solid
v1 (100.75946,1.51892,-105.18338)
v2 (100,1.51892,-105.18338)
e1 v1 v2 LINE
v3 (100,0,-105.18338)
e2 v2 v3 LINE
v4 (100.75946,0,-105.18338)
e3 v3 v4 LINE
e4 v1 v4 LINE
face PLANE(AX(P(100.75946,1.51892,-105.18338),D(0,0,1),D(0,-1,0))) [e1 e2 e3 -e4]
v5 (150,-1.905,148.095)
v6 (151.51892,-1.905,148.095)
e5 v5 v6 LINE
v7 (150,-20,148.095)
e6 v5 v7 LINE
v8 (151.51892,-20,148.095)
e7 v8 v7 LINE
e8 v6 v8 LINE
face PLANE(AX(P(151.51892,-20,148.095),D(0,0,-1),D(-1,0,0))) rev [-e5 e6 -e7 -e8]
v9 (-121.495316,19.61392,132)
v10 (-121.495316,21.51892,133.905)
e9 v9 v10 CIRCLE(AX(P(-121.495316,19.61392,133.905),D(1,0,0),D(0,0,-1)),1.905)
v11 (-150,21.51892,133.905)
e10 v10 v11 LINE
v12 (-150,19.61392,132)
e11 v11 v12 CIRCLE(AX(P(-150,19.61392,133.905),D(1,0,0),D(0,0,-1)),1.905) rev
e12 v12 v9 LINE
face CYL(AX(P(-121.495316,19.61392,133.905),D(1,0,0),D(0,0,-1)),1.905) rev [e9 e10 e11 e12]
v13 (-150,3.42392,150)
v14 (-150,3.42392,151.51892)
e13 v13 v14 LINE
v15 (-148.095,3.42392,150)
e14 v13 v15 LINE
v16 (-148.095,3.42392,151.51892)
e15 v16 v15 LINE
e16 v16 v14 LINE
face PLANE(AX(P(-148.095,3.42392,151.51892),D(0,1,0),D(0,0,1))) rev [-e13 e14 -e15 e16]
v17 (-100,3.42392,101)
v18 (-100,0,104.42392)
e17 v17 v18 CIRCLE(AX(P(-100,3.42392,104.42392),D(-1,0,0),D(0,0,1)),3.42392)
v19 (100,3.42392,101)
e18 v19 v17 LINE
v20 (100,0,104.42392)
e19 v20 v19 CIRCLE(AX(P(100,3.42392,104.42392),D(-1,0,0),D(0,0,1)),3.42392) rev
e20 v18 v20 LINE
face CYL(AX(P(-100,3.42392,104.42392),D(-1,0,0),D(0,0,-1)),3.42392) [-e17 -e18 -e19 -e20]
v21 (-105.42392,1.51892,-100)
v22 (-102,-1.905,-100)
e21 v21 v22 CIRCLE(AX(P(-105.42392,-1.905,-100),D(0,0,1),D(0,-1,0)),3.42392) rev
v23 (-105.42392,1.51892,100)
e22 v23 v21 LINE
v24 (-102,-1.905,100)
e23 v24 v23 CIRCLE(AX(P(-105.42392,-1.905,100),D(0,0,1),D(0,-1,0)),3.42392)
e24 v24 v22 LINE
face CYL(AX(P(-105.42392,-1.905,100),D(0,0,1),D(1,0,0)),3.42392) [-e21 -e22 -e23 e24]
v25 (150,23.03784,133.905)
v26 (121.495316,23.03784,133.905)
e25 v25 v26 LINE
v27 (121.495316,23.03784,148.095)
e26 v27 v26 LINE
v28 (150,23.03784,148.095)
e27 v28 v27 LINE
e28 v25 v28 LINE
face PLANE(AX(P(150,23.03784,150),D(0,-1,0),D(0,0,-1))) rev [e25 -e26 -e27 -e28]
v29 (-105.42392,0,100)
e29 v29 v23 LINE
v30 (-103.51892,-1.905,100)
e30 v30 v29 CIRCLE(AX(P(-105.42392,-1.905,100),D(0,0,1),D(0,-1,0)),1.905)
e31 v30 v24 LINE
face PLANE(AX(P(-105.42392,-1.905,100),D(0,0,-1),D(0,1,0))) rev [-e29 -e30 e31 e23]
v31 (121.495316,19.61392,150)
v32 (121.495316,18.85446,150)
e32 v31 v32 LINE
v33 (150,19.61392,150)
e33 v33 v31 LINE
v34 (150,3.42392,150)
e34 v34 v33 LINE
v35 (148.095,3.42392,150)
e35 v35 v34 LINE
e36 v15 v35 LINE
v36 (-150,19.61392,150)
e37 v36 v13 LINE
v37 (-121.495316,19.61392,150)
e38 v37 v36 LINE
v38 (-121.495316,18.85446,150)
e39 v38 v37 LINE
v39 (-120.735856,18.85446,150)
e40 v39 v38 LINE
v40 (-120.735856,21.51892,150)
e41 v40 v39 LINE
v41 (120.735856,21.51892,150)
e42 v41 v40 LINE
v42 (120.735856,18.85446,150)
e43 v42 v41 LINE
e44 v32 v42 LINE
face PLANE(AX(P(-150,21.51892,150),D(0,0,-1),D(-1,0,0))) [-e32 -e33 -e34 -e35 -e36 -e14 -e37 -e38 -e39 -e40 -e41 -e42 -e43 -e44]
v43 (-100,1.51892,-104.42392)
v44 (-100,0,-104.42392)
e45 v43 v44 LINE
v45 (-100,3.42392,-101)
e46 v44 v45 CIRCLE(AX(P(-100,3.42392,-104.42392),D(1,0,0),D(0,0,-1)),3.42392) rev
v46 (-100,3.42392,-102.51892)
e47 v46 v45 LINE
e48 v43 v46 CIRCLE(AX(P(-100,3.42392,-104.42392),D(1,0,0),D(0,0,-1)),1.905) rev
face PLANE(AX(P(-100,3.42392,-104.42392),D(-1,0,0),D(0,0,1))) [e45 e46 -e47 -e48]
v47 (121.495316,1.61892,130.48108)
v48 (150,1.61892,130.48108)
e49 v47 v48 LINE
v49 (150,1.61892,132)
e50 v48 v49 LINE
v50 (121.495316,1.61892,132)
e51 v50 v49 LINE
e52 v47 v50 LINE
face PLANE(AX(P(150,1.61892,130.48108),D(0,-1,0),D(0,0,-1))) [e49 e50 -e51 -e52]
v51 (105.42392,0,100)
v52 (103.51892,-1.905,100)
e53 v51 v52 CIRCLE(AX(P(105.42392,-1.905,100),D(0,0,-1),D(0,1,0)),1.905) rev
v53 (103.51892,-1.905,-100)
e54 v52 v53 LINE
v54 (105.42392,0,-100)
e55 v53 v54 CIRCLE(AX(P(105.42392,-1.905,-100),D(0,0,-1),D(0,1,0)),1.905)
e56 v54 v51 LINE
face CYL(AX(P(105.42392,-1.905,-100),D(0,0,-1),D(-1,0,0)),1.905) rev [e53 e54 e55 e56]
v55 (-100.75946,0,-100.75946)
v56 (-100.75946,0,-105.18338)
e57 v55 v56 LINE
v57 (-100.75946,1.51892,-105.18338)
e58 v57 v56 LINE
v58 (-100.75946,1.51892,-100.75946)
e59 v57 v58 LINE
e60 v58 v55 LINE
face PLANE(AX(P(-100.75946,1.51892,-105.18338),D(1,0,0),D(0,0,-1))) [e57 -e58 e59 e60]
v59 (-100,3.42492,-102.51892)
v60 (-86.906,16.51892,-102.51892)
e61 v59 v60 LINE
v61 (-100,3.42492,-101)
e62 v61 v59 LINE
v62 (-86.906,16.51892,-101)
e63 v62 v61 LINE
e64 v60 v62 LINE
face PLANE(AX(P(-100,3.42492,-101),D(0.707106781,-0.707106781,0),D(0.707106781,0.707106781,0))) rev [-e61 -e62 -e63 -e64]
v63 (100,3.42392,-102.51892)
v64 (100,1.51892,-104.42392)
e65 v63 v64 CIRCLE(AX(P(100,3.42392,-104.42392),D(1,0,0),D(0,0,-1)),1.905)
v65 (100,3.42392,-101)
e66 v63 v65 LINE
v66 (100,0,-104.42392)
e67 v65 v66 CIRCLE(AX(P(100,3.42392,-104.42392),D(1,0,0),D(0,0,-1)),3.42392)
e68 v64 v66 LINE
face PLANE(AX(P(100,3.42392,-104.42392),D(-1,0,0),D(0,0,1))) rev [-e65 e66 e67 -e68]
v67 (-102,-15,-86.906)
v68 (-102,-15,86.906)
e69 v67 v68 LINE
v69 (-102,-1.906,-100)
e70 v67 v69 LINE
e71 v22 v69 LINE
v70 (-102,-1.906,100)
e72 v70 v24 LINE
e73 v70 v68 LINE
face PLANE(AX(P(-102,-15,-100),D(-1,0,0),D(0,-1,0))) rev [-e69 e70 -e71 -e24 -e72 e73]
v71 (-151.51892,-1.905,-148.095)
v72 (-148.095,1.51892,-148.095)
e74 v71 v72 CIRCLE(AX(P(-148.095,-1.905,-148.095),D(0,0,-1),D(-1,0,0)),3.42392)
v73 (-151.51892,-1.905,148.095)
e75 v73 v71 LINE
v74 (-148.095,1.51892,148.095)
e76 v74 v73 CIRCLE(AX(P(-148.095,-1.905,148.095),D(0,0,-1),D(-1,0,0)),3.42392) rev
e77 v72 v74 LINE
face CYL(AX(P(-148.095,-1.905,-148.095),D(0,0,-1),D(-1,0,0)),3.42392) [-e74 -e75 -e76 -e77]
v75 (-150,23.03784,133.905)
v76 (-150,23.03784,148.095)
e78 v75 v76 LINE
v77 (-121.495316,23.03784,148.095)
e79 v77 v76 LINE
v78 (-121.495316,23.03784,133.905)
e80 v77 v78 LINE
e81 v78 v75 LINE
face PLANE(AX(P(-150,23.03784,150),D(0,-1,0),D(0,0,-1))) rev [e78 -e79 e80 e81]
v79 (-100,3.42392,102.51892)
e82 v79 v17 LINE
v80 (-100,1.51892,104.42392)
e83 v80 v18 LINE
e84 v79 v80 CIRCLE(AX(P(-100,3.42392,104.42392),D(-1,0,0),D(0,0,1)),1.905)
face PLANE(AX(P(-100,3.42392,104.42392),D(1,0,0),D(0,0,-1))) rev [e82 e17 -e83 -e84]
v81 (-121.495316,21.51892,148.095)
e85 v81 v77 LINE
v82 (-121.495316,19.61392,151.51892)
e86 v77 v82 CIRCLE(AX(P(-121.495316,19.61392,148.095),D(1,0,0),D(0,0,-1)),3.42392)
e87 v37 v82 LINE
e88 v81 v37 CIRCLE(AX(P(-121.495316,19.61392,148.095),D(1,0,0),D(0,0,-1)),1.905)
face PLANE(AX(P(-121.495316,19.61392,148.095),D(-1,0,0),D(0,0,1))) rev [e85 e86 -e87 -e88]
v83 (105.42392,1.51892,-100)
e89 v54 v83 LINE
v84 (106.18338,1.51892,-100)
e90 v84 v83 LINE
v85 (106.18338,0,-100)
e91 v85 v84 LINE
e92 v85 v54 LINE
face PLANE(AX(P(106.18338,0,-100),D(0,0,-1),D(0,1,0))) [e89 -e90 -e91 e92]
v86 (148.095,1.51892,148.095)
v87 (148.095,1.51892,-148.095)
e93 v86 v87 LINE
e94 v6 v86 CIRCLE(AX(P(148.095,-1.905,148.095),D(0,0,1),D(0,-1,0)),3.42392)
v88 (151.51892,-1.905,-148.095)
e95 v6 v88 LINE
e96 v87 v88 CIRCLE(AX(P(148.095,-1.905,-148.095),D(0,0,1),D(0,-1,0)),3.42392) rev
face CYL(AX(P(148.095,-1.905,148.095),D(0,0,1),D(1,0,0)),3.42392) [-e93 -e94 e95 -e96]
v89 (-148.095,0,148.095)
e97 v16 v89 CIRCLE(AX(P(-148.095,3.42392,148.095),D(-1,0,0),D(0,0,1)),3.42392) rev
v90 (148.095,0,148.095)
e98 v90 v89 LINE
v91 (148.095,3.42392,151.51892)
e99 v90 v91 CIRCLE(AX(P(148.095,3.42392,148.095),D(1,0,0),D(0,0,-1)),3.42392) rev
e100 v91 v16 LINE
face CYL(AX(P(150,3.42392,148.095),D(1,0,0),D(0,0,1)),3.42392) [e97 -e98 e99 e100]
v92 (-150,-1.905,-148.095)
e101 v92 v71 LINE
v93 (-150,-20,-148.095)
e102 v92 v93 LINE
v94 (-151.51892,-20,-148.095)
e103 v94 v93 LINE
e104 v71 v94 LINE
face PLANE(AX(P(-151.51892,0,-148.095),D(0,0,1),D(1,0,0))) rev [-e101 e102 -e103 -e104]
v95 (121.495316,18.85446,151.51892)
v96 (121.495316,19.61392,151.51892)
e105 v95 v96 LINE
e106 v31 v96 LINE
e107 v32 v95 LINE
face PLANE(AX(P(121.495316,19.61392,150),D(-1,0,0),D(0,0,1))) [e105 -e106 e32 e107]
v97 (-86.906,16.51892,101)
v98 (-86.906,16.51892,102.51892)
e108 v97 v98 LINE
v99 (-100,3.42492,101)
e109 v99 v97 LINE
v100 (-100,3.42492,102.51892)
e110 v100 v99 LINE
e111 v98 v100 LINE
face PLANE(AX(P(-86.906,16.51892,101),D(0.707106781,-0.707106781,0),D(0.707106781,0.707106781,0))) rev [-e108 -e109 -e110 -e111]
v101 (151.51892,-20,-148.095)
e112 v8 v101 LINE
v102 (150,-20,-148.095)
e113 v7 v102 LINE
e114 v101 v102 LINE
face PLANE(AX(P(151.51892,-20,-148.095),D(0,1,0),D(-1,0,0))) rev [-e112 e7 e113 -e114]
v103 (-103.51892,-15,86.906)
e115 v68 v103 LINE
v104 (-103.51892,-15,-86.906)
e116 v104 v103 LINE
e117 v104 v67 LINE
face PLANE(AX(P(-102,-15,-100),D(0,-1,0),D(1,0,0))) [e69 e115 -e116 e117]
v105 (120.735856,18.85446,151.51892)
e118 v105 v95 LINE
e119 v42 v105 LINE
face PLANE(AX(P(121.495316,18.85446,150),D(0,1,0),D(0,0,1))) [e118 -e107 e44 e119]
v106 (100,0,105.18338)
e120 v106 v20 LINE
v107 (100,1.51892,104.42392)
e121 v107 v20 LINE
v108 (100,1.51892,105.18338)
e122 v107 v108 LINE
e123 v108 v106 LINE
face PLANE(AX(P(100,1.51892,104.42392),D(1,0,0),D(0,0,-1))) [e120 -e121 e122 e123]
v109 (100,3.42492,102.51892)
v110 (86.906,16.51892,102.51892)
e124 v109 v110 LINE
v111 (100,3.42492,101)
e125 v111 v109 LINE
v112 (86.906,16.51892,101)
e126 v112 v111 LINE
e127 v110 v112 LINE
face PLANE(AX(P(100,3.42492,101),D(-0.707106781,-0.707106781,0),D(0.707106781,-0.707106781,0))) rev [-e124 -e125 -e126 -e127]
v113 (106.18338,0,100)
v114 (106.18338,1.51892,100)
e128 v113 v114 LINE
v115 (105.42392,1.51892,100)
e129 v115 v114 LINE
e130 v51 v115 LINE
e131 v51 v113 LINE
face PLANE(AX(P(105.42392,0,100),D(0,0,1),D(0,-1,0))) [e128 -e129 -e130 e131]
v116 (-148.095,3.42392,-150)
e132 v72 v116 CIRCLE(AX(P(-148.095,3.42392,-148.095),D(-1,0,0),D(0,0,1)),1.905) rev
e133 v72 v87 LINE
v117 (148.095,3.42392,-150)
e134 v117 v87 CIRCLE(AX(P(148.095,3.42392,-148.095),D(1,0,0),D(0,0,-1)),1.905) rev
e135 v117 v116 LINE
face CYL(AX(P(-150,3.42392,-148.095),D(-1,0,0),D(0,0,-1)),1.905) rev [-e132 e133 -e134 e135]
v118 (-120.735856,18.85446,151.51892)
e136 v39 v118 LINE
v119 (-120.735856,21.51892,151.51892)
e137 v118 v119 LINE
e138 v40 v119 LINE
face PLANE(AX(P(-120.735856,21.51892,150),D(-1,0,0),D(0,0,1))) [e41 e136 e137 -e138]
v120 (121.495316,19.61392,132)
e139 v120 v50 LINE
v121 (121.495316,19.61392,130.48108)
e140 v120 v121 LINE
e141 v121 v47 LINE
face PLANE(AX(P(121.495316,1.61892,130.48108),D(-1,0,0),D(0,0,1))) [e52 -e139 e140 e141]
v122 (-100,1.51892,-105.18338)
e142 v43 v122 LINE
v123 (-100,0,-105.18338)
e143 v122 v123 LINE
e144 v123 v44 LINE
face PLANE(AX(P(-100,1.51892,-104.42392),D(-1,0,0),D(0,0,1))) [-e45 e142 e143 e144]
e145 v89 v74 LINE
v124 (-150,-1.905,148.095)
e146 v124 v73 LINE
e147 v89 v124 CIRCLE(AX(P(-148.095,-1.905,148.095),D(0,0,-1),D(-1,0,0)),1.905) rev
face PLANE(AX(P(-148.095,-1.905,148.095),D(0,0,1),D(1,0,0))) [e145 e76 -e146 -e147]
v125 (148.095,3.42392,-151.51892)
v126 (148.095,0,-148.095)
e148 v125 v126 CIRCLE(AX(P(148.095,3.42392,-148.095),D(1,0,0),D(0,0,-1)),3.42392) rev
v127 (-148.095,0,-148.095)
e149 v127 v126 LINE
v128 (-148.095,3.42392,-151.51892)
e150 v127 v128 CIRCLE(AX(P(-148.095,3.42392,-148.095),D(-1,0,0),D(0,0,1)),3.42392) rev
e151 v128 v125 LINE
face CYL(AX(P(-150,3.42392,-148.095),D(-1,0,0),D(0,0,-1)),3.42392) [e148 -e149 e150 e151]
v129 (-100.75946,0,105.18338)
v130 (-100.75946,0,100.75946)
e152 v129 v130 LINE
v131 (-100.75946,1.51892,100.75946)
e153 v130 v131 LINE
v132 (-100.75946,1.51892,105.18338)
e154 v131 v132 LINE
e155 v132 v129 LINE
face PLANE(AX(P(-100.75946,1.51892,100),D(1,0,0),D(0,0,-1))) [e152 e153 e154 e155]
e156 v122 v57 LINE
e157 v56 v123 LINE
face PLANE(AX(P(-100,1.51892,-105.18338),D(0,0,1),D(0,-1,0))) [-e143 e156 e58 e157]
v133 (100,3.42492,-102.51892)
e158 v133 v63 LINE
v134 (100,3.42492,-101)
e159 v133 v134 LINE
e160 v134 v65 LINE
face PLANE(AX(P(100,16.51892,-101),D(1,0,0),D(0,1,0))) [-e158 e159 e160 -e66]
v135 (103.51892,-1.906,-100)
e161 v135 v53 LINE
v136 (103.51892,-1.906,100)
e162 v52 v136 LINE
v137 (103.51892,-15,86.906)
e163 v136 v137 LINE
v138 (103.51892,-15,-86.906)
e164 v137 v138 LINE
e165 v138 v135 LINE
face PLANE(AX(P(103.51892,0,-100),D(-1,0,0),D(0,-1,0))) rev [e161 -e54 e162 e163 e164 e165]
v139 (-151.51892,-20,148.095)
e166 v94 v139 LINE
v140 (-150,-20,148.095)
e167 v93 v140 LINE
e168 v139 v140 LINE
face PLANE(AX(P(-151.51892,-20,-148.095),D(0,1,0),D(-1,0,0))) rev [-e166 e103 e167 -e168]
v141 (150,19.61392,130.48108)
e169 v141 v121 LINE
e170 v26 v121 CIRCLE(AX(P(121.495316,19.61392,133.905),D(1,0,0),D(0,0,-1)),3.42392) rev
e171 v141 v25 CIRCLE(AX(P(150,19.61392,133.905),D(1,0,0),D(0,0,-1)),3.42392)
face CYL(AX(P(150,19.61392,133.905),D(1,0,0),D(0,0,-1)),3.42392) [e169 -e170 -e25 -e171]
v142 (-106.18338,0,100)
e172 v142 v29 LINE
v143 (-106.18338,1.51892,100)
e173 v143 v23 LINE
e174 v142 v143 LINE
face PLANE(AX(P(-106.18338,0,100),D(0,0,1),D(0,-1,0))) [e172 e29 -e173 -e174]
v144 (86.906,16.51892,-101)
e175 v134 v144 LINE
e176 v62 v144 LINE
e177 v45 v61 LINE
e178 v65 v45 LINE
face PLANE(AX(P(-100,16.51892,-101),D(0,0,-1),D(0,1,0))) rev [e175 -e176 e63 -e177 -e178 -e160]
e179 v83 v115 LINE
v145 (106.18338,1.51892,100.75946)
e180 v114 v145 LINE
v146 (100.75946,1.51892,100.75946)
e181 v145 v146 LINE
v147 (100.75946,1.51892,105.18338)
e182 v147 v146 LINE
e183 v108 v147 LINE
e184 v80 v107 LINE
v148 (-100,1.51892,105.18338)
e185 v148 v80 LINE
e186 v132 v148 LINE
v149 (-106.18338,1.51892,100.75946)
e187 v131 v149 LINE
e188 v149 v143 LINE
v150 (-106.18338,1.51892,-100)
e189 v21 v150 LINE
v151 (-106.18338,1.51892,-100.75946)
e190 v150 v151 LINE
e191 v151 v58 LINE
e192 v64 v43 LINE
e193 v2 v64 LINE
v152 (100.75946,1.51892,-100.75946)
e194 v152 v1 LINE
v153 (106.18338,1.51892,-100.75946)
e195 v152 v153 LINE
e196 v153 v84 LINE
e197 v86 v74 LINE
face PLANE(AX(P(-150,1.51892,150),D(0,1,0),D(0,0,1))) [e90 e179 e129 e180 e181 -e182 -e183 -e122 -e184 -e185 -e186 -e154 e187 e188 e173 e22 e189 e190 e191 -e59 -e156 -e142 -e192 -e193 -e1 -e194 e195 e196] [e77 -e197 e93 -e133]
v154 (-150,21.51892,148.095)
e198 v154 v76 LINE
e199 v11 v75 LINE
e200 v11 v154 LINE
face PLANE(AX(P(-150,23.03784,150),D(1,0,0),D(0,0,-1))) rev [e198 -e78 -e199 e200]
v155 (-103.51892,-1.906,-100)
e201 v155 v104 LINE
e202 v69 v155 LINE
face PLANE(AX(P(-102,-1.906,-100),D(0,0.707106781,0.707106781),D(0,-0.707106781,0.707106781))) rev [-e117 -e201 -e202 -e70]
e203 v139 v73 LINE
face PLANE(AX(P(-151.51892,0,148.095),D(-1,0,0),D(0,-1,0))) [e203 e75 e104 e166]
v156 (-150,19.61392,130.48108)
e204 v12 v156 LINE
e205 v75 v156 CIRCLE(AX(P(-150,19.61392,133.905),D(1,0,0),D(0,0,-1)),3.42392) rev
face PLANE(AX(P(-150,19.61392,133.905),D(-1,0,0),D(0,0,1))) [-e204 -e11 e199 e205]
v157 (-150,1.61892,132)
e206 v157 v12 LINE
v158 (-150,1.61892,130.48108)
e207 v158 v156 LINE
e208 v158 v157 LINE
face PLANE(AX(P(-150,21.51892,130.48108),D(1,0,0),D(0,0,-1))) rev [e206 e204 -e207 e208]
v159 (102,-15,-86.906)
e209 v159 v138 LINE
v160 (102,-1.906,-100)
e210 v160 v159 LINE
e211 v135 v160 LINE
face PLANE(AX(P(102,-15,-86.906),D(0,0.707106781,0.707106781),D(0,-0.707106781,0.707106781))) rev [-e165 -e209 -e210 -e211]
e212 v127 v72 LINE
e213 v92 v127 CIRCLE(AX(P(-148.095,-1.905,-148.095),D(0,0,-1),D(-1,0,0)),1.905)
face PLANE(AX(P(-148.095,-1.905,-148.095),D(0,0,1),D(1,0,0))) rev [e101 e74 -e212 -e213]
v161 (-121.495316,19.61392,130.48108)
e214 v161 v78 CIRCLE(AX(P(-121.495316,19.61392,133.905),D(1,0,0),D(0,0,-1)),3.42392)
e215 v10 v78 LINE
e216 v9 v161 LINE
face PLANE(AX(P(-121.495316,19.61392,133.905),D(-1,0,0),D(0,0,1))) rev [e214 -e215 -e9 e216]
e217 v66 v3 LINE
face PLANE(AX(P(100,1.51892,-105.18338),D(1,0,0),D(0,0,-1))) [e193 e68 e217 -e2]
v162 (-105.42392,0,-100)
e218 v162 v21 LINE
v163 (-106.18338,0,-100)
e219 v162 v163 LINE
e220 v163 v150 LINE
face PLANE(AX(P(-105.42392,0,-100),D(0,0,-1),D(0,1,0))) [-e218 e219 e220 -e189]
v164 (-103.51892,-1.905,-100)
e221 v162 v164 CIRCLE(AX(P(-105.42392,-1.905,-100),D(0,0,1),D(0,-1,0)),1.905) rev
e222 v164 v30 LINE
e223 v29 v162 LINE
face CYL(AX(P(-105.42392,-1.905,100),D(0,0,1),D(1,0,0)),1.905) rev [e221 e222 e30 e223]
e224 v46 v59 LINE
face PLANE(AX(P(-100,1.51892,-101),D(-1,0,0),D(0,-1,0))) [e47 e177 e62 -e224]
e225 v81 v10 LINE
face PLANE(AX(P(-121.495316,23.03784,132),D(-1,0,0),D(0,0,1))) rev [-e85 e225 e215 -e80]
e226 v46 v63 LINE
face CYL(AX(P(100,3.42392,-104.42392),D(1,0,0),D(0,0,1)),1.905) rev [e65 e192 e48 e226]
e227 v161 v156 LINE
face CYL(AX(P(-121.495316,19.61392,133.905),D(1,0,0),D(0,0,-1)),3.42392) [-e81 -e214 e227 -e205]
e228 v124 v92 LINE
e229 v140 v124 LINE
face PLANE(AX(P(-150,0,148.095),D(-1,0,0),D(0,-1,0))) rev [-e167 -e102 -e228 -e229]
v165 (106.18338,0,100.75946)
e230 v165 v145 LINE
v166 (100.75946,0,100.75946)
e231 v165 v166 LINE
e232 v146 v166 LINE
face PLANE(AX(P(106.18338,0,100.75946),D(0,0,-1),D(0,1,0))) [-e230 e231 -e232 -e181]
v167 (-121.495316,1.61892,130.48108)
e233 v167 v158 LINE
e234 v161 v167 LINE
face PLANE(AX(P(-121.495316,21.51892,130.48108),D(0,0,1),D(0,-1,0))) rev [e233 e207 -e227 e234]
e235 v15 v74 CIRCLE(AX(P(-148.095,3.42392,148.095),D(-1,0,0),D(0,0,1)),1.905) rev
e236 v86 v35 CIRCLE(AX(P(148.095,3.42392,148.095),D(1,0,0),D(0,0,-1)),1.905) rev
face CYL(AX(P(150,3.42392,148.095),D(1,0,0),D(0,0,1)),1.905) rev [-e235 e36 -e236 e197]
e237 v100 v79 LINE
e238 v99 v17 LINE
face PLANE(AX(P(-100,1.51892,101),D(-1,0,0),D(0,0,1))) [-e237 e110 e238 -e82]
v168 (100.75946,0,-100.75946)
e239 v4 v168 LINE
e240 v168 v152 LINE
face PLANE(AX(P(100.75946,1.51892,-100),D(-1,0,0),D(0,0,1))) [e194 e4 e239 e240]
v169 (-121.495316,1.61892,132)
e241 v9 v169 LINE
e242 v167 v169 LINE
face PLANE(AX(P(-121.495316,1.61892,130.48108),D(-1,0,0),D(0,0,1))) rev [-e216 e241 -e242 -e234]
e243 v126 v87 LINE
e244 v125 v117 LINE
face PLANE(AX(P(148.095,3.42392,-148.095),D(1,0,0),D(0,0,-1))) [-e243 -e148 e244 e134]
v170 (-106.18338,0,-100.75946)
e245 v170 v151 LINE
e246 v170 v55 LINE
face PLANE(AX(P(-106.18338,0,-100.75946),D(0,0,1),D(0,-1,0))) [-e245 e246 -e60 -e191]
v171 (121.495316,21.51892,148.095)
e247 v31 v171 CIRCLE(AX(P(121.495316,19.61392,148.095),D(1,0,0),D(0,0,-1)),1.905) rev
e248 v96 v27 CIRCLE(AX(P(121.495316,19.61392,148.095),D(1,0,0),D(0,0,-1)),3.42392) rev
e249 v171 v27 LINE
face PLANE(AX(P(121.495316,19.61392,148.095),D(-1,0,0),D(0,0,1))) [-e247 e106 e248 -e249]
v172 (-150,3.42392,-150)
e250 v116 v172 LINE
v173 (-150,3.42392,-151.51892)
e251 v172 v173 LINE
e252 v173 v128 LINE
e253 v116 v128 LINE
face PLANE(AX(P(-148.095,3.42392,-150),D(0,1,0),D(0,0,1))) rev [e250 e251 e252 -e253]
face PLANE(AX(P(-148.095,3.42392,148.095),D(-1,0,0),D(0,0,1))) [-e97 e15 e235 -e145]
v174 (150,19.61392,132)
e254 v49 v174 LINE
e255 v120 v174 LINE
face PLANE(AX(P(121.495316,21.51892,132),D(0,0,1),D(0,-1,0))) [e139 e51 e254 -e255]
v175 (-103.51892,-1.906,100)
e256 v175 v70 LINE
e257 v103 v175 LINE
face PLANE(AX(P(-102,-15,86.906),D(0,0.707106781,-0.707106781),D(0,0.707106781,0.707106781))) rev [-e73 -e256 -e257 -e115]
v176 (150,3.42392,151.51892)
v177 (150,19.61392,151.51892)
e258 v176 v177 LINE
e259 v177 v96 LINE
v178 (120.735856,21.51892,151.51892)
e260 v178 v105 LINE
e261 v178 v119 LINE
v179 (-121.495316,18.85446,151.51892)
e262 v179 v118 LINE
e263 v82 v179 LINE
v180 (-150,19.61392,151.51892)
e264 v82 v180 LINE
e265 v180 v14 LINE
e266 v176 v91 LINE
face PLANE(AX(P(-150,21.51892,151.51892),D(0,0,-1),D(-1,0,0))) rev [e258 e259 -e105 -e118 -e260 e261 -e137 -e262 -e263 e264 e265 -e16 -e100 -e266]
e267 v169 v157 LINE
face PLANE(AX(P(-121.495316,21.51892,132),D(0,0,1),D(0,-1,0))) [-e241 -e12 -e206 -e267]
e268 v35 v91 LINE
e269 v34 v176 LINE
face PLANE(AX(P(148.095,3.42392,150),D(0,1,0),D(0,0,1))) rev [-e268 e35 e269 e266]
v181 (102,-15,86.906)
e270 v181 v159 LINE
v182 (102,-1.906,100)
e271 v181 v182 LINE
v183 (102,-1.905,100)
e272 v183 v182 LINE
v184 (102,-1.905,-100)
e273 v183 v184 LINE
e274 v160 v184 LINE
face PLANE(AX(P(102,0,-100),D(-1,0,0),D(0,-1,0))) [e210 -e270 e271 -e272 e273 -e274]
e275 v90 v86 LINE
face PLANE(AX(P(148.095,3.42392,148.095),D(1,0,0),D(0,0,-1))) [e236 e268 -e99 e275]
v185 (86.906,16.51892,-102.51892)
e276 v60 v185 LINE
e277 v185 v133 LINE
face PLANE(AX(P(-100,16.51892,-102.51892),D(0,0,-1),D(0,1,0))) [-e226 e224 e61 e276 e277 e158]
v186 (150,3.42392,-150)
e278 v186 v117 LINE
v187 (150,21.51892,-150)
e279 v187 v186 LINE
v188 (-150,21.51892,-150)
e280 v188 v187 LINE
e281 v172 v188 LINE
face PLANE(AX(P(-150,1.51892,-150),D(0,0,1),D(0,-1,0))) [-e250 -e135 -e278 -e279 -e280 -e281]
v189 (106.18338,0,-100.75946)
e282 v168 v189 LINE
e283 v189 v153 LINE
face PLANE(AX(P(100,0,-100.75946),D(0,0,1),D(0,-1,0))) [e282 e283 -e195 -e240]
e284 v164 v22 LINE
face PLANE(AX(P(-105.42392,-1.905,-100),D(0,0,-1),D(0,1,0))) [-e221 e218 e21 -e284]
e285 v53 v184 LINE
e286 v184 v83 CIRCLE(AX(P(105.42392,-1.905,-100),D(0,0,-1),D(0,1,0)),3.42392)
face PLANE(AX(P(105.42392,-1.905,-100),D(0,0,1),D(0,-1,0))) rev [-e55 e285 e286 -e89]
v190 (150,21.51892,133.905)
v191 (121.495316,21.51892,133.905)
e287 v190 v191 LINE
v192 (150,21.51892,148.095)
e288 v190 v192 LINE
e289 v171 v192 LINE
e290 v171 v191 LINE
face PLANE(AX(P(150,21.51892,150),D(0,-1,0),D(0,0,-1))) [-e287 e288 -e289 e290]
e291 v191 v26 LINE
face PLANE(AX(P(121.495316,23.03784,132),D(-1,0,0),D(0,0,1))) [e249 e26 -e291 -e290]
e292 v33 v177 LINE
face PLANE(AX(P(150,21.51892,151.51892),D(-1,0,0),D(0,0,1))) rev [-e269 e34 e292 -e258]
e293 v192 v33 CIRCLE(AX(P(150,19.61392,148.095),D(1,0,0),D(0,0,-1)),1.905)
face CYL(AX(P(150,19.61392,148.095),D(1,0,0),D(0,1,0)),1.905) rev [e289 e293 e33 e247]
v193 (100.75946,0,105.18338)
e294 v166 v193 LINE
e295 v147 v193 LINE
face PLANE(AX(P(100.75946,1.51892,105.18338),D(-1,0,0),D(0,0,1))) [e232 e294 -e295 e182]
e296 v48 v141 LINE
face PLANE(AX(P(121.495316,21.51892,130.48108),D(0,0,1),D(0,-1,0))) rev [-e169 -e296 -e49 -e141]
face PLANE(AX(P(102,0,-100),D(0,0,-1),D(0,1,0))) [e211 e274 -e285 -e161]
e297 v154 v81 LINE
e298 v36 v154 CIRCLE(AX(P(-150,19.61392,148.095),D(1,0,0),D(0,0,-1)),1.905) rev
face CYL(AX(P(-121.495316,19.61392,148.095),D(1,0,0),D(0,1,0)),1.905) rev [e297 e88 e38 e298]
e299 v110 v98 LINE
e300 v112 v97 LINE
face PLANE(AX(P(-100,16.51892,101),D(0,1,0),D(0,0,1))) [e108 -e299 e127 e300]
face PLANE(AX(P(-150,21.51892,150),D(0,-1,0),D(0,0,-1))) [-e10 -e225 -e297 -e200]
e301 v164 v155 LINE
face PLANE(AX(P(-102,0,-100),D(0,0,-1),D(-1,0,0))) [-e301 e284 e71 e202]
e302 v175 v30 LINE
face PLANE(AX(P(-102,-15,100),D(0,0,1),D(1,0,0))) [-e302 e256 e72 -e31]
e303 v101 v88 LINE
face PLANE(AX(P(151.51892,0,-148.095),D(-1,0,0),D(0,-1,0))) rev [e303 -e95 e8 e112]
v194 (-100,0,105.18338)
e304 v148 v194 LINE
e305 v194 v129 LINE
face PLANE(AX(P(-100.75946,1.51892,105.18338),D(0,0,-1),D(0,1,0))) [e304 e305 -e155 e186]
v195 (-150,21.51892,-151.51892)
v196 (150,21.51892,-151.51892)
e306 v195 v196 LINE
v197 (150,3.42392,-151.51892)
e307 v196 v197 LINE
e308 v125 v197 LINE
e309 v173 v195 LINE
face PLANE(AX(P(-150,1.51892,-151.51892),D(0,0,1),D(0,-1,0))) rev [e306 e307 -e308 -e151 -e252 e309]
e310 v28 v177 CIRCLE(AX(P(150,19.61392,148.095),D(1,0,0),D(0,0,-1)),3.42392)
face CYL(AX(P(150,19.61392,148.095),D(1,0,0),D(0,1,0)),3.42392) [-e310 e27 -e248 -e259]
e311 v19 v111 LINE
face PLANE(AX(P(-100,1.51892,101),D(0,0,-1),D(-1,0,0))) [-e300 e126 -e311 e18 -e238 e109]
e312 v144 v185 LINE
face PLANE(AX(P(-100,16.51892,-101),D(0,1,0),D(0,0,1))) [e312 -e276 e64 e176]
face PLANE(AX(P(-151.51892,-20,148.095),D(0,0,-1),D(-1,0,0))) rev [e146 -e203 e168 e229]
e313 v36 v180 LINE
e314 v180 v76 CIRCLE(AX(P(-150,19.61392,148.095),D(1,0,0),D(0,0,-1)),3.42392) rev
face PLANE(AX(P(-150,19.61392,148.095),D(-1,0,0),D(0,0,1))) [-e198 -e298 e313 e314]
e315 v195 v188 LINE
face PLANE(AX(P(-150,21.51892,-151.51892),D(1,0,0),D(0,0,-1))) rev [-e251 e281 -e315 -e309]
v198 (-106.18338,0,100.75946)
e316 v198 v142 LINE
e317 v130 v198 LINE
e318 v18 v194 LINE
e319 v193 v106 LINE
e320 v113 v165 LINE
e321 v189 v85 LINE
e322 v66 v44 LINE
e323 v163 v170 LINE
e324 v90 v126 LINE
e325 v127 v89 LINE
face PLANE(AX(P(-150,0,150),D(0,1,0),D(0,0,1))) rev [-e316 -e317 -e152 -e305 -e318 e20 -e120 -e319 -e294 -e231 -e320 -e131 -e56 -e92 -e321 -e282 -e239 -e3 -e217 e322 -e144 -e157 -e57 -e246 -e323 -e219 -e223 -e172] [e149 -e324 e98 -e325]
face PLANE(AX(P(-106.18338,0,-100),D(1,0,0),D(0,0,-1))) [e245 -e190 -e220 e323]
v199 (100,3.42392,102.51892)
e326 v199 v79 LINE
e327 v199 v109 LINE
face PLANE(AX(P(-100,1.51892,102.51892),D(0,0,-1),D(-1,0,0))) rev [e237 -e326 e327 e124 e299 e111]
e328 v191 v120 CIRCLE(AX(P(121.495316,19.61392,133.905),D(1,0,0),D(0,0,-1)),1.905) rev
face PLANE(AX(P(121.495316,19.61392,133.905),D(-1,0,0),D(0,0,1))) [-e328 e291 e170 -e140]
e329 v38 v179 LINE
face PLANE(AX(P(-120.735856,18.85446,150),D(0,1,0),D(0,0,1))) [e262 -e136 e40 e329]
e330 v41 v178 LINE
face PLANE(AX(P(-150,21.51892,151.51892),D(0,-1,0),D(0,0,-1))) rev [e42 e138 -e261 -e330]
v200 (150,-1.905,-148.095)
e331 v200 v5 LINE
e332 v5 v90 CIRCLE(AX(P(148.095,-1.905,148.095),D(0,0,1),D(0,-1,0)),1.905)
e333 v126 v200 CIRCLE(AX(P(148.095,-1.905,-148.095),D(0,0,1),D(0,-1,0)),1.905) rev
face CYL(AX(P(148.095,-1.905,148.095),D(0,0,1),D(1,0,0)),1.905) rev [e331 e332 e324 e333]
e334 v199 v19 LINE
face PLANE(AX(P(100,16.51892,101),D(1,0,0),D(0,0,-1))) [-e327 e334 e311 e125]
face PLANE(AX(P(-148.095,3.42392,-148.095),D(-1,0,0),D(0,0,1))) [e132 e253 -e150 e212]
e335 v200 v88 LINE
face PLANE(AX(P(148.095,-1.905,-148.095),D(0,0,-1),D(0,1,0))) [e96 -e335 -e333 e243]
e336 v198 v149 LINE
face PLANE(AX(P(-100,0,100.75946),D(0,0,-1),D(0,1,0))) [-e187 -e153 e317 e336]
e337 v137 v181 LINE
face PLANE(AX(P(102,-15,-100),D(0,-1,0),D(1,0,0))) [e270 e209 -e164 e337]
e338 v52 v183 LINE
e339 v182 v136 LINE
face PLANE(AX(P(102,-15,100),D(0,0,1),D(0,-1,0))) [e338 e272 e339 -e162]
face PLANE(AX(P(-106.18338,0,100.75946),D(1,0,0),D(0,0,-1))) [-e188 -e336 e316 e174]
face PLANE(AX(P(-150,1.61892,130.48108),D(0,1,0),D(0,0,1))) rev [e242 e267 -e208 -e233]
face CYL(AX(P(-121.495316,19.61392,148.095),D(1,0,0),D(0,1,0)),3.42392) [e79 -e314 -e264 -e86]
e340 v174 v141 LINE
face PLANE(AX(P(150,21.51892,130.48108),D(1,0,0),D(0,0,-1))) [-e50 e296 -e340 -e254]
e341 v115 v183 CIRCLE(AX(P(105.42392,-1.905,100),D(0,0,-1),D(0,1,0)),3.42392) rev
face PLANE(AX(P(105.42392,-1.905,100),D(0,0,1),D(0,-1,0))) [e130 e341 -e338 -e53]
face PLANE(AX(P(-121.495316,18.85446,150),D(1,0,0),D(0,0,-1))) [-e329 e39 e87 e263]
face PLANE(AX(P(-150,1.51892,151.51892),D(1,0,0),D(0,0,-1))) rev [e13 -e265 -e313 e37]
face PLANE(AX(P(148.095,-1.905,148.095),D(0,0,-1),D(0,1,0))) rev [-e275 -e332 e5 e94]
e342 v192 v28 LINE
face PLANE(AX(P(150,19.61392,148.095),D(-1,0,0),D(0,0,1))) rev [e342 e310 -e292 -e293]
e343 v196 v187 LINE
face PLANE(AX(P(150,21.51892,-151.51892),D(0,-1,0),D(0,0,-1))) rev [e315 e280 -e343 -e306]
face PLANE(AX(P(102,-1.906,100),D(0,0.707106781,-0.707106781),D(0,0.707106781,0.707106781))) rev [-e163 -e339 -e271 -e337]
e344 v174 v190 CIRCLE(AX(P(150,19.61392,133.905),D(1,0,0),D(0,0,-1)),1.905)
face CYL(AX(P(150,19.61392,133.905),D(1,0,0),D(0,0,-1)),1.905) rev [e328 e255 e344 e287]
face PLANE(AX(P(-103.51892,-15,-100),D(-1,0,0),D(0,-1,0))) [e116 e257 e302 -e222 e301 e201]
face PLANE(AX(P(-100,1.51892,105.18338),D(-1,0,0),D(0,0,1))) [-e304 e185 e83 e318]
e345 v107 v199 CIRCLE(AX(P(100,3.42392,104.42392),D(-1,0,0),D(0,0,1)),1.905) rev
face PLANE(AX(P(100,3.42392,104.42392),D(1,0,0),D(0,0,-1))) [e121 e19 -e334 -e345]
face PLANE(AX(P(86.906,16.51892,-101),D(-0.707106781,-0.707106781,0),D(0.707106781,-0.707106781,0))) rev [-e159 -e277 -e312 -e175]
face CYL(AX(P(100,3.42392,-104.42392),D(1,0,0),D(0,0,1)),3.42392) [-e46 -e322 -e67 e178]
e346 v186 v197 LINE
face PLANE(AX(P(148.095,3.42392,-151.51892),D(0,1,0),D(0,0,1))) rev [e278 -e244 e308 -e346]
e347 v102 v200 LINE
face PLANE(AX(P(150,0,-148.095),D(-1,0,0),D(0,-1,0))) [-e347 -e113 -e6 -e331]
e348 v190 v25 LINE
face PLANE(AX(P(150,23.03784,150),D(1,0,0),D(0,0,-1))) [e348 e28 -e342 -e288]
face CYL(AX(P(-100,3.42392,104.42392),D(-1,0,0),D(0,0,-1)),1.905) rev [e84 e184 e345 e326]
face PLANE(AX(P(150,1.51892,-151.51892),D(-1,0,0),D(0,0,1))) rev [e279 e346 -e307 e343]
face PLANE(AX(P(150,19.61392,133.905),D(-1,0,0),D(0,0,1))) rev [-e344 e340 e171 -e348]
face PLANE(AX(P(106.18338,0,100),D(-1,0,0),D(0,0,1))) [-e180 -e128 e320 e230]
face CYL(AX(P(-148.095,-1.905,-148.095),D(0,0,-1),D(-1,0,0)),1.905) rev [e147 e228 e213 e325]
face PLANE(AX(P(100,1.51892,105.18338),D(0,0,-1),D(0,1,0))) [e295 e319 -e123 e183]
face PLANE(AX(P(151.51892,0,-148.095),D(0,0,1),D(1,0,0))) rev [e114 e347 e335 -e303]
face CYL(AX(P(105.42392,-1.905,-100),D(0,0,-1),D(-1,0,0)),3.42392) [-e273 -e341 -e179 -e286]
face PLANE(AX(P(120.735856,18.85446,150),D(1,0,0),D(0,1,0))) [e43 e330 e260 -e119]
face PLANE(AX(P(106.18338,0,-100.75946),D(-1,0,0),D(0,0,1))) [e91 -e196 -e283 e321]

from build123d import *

# Parameters (mm, degrees)
SKETCH1_W                       = 300
SKETCH1_H                       = 300
SKETCH1_W_2                     = 200
SKETCH1_H_2                     = 200
BASE_FLANGE1_DEPTH              = 1.51892
EDGE_FLANGE10_STRIP_W           = 9.88568
EDGE_FLANGE10_STRIP_H           = 1.51892
EDGE_FLANGE10_STRIP_CUT_DEPTH   = 300
EDGE_FLANGE10_STRIP_2_W         = 9.88568
EDGE_FLANGE10_STRIP_2_H         = 1.51892
EDGE_FLANGE10_STRIP_CUT_2_DEPTH = 300
EDGE_FLANGE10_DEPTH             = 300
EDGE_FLANGE10_BEND_DEPTH        = 300
EDGE_FLANGE2_START              = -151.51892
EDGE_FLANGE2_DEPTH              = 303.03784
EDGE_FLANGE2_2_DEPTH            = 3.42392
EDGE_FLANGE2_START_2            = 148.095
EDGE_FLANGE2_3_DEPTH            = 3.42392
EDGE_FLANGE2_START_3            = -148.095
EDGE_FLANGE2_4_DEPTH            = 296.19
EDGE_FLANGE7_START              = -100.75946
EDGE_FLANGE7_DEPTH              = 201.51892
EDGE_FLANGE7_2_DEPTH            = 0.75946
EDGE_FLANGE7_START_2            = 100
EDGE_FLANGE7_3_DEPTH            = 0.75946
EDGE_FLANGE7_START_3            = -100
EDGE_FLANGE7_4_DEPTH            = 200
EDGE_FLANGE8_STRIP_W            = 11.88568
EDGE_FLANGE8_STRIP_H            = 1.51892
EDGE_FLANGE8_STRIP_CUT_DEPTH    = 200
EDGE_FLANGE8_RELIEF_W           = 12.64514
EDGE_FLANGE8_RELIEF_H           = 0.75946
EDGE_FLANGE8_RELIEF_CUT_DEPTH   = 1.51892
EDGE_FLANGE8_STRIP_2_W          = 11.88568
EDGE_FLANGE8_STRIP_2_H          = 1.51892
EDGE_FLANGE8_STRIP_CUT_2_DEPTH  = 200
EDGE_FLANGE8_RELIEF_2_W         = 12.64514
EDGE_FLANGE8_RELIEF_2_H         = 0.75946
EDGE_FLANGE8_RELIEF_CUT_2_DEPTH = 1.51892
EDGE_FLANGE8_DEPTH              = 200
EDGE_FLANGE8_BEND_DEPTH         = 200
BREAK_CORNER1_START             = -82.391318469
BREAK_CORNER1_OUTLINE_W         = 22
BREAK_CORNER1_OUTLINE_H         = 208
BREAK_CORNER1_DEPTH             = 9.258856193
BREAK_CORNER1_START_2           = 73.132462276
BREAK_CORNER1_2_OUTLINE_W       = 22
BREAK_CORNER1_2_OUTLINE_H       = 208
BREAK_CORNER1_2_DEPTH           = 9.258856193
BREAK_CORNER1_START_3           = -81.317279836
BREAK_CORNER1_3_OUTLINE_W       = 210
BREAK_CORNER1_3_OUTLINE_H       = 22
BREAK_CORNER1_3_DEPTH           = 9.258856192
BREAK_CORNER1_4_OUTLINE_W       = 210
BREAK_CORNER1_4_OUTLINE_H       = 22
BREAK_CORNER1_4_DEPTH           = 9.258856192
EDGE_FLANGE11_STRIP_W           = 9.88568
EDGE_FLANGE11_STRIP_H           = 1.51892
EDGE_FLANGE11_STRIP_CUT_DEPTH   = 28.504683669
EDGE_FLANGE11_RELIEF_W          = 10.64514
EDGE_FLANGE11_RELIEF_H          = 0.75946
EDGE_FLANGE11_RELIEF_CUT_DEPTH  = 1.51892
EDGE_FLANGE11_DEPTH             = 28.504683669
EDGE_FLANGE12_STRIP_W           = 9.88568
EDGE_FLANGE12_STRIP_H           = 1.51892
EDGE_FLANGE12_STRIP_CUT_DEPTH   = 28.504683669
EDGE_FLANGE12_DEPTH             = 28.504683669


# Read off the part's stored shape, not the designer's step: Edge-Flange2, Edge-Flange7, Break-Corner1
# Sheet-metal steps are written as plain solids
with BuildPart() as part:
    # Sketch1 → Base-Flange1 (new body)
    with BuildSketch(Plane(origin=(0, 0, 0), x_dir=(1, 0, 0), z_dir=(0, 1, 0))):
        Rectangle(SKETCH1_W, SKETCH1_H)
        Rectangle(SKETCH1_W_2, SKETCH1_H_2, mode=Mode.SUBTRACT)
    extrude(amount=BASE_FLANGE1_DEPTH)

    # Edge-Flange10 strip (across the edge) → Edge-Flange10 strip cut (cut)
    with BuildSketch(Plane(origin=(150, 1.51892, -150), x_dir=(0, 0, 1), z_dir=(-1, 0, 0))):
        with Locations((-3.03784, -0.75946)):
            Rectangle(EDGE_FLANGE10_STRIP_W, EDGE_FLANGE10_STRIP_H)
    extrude(amount=EDGE_FLANGE10_STRIP_CUT_DEPTH, mode=Mode.SUBTRACT)

    # Edge-Flange10 strip 2 (across the edge) → Edge-Flange10 strip cut 2 (cut)
    with BuildSketch(Plane(origin=(-150, 1.51892, 150), x_dir=(0, 0, -1), z_dir=(1, 0, 0))):
        with Locations((-3.03784, -0.75946)):
            Rectangle(EDGE_FLANGE10_STRIP_2_W, EDGE_FLANGE10_STRIP_2_H)
    extrude(amount=EDGE_FLANGE10_STRIP_CUT_2_DEPTH, mode=Mode.SUBTRACT)

    # Edge-Flange10 section (across the edge) → Edge-Flange10 (add)
    with BuildSketch(Plane(origin=(150, 1.51892, -150), x_dir=(0, 0, 1), z_dir=(-1, 0, 0))):
        with BuildLine():
            Line((-1.51892, 1.905), (-1.51892, 20))
            Line((-1.51892, 20), (0, 20))
            Line((0, 20), (0, 1.905))
            ThreePointArc((0, 1.905), (0.557961582, 0.557961582), (1.905, 0))
            Line((1.905, 0), (1.905, -1.51892))
            ThreePointArc((1.905, -1.51892), (-0.51607705, -0.51607705), (-1.51892, 1.905))
        make_face()
    extrude(amount=EDGE_FLANGE10_DEPTH)

    # Edge-Flange10 section 2 (across the edge) → Edge-Flange10 bend (add)
    with BuildSketch(Plane(origin=(-150, 1.51892, 150), x_dir=(0, 0, -1), z_dir=(1, 0, 0))):
        with BuildLine():
            Line((-1.51892, 1.905), (-1.51892, 20))
            Line((-1.51892, 20), (0, 20))
            Line((0, 20), (0, 1.905))
            ThreePointArc((0, 1.905), (0.557961582, 0.557961582), (1.905, 0))
            Line((1.905, 0), (1.905, -1.51892))
            ThreePointArc((1.905, -1.51892), (-0.51607705, -0.51607705), (-1.51892, 1.905))
        make_face()
    extrude(amount=EDGE_FLANGE10_BEND_DEPTH)

    # Edge-Flange2 outline → Edge-Flange2 (cut)
    with BuildSketch(Plane.XY.offset(EDGE_FLANGE2_START)):
        with BuildLine():
            Line((-148.095, 1.51892), (-148.095, 3.42392))
            Line((-148.095, 3.42392), (-150, 3.42392))
            Line((-150, 3.42392), (-150, 0.940031312))
            ThreePointArc((-150, 0.940031312), (-149.090507046, 1.37100273), (-148.095, 1.51892))
        make_face()
        with BuildLine():
            Line((150, 0.940031312), (150, 3.42392))
            Line((150, 3.42392), (148.095, 3.42392))
            Line((148.095, 3.42392), (148.095, 1.51892))
            ThreePointArc((148.095, 1.51892), (149.090507046, 1.37100273), (150, 0.940031312))
        make_face()
    extrude(amount=EDGE_FLANGE2_DEPTH, mode=Mode.SUBTRACT)

    # Edge-Flange2 2 outline → Edge-Flange2 2 (cut)
    with BuildSketch(Plane.XY.offset(EDGE_FLANGE2_START)):
        with BuildLine():
            Line((-148.095, 0), (-148.095, 1.51892))
            ThreePointArc((-148.095, 1.51892), (-149.090507046, 1.37100273), (-150, 0.940031312))
            ThreePointArc((-150, 0.940031312), (-151.115413528, -0.292446037), (-151.51892, -1.905))
            Line((-151.51892, -1.905), (-151.51892, -20))
            Line((-151.51892, -20), (-150, -20))
            Line((-150, -20), (-150, -1.905))
            ThreePointArc((-150, -1.905), (-149.442038418, -0.557961582), (-148.095, 0))
        make_face()
        with BuildLine():
            ThreePointArc((150, 0.940031312), (149.090507046, 1.37100273), (148.095, 1.51892))
            Line((148.095, 1.51892), (148.095, 0))
            ThreePointArc((148.095, 0), (149.442038418, -0.557961582), (150, -1.905))
            Line((150, -1.905), (150, -20))
            Line((150, -20), (151.51892, -20))
            Line((151.51892, -20), (151.51892, -1.905))
            ThreePointArc((151.51892, -1.905), (151.115413528, -0.292446037), (150, 0.940031312))
        make_face()
    extrude(amount=EDGE_FLANGE2_2_DEPTH, mode=Mode.SUBTRACT)

    # Edge-Flange2 3 outline → Edge-Flange2 3 (cut)
    with BuildSketch(Plane.XY.offset(EDGE_FLANGE2_START_2)):
        with BuildLine():
            Line((-148.095, 0), (-148.095, 1.51892))
            ThreePointArc((-148.095, 1.51892), (-149.090507046, 1.37100273), (-150, 0.940031312))
            ThreePointArc((-150, 0.940031312), (-151.115413528, -0.292446037), (-151.51892, -1.905))
            Line((-151.51892, -1.905), (-151.51892, -20))
            Line((-151.51892, -20), (-150, -20))
            Line((-150, -20), (-150, -1.905))
            ThreePointArc((-150, -1.905), (-149.442038418, -0.557961582), (-148.095, 0))
        make_face()
        with BuildLine():
            ThreePointArc((150, 0.940031312), (149.090507046, 1.37100273), (148.095, 1.51892))
            Line((148.095, 1.51892), (148.095, 0))
            ThreePointArc((148.095, 0), (149.442038418, -0.557961582), (150, -1.905))
            Line((150, -1.905), (150, -20))
            Line((150, -20), (151.51892, -20))
            Line((151.51892, -20), (151.51892, -1.905))
            ThreePointArc((151.51892, -1.905), (151.115413528, -0.292446037), (150, 0.940031312))
        make_face()
    extrude(amount=EDGE_FLANGE2_3_DEPTH, mode=Mode.SUBTRACT)

    # Edge-Flange2 4 outline → Edge-Flange2 4 (add)
    with BuildSketch(Plane.XY.offset(EDGE_FLANGE2_START_3)):
        with BuildLine():
            Line((-148.095, 0), (-148.095, 1.51892))
            ThreePointArc((-148.095, 1.51892), (-149.090507046, 1.37100273), (-150, 0.940031312))
            ThreePointArc((-150, 0.940031312), (-151.115413528, -0.292446037), (-151.51892, -1.905))
            Line((-151.51892, -1.905), (-151.51892, -20))
            Line((-151.51892, -20), (-150, -20))
            Line((-150, -20), (-150, -1.905))
            ThreePointArc((-150, -1.905), (-149.442038418, -0.557961582), (-148.095, 0))
        make_face()
        with BuildLine():
            ThreePointArc((150, 0.940031312), (149.090507046, 1.37100273), (148.095, 1.51892))
            Line((148.095, 1.51892), (148.095, 0))
            ThreePointArc((148.095, 0), (149.442038418, -0.557961582), (150, -1.905))
            Line((150, -1.905), (150, -20))
            Line((150, -20), (151.51892, -20))
            Line((151.51892, -20), (151.51892, -1.905))
            ThreePointArc((151.51892, -1.905), (151.115413528, -0.292446037), (150, 0.940031312))
        make_face()
    extrude(amount=EDGE_FLANGE2_4_DEPTH)

    # Edge-Flange7 outline → Edge-Flange7 (cut)
    with BuildSketch(Plane.YZ.offset(EDGE_FLANGE7_START)):
        with BuildLine():
            ThreePointArc((1.51892, 101.578888688), (0.403506472, 102.811366037), (0, 104.42392))
            Line((0, 104.42392), (0, 100))
            Line((0, 100), (1.51892, 100))
            Line((1.51892, 100), (1.51892, 101.578888688))
        make_face()
        with BuildLine():
            Line((1.51892, -100), (0, -100))
            Line((0, -100), (0, -104.42392))
            ThreePointArc((0, -104.42392), (0.403506472, -102.811366037), (1.51892, -101.578888688))
            Line((1.51892, -101.578888688), (1.51892, -100))
        make_face()
    extrude(amount=EDGE_FLANGE7_DEPTH, mode=Mode.SUBTRACT)

    # Edge-Flange7 2 outline → Edge-Flange7 2 (cut)
    with BuildSketch(Plane.YZ.offset(EDGE_FLANGE7_START)):
        with BuildLine():
            Line((1.51892, 105.18338), (0, 105.18338))
            Line((0, 105.18338), (0, 104.42392))
            ThreePointArc((0, 104.42392), (0.403506472, 102.811366037), (1.51892, 101.578888688))
            Line((1.51892, 101.578888688), (1.51892, 105.18338))
        make_face()
        with BuildLine():
            ThreePointArc((1.51892, -101.578888688), (0.403506472, -102.811366037), (0, -104.42392))
            Line((0, -104.42392), (0, -105.18338))
            Line((0, -105.18338), (1.51892, -105.18338))
            Line((1.51892, -105.18338), (1.51892, -101.578888688))
        make_face()
    extrude(amount=EDGE_FLANGE7_2_DEPTH, mode=Mode.SUBTRACT)

    # Edge-Flange7 3 outline → Edge-Flange7 3 (cut)
    with BuildSketch(Plane.YZ.offset(EDGE_FLANGE7_START_2)):
        with BuildLine():
            Line((1.51892, 105.18338), (0, 105.18338))
            Line((0, 105.18338), (0, 104.42392))
            ThreePointArc((0, 104.42392), (0.403506472, 102.811366037), (1.51892, 101.578888688))
            Line((1.51892, 101.578888688), (1.51892, 105.18338))
        make_face()
        with BuildLine():
            ThreePointArc((1.51892, -101.578888688), (0.403506472, -102.811366037), (0, -104.42392))
            Line((0, -104.42392), (0, -105.18338))
            Line((0, -105.18338), (1.51892, -105.18338))
            Line((1.51892, -105.18338), (1.51892, -101.578888688))
        make_face()
    extrude(amount=EDGE_FLANGE7_3_DEPTH, mode=Mode.SUBTRACT)

    # Edge-Flange7 4 outline → Edge-Flange7 4 (add)
    with BuildSketch(Plane.YZ.offset(EDGE_FLANGE7_START_3)):
        with BuildLine():
            ThreePointArc((3.42392, 102.51892), (2.076881582, 103.076881582), (1.51892, 104.42392))
            Line((1.51892, 104.42392), (1.51892, 101.578888688))
            ThreePointArc((1.51892, 101.578888688), (2.428412954, 101.14791727), (3.42392, 101))
            Line((3.42392, 101), (16.51892, 101))
            Line((16.51892, 101), (16.51892, 102.51892))
            Line((16.51892, 102.51892), (3.42392, 102.51892))
        make_face()
        with BuildLine():
            ThreePointArc((3.42392, -101), (2.428412954, -101.14791727), (1.51892, -101.578888688))
            Line((1.51892, -101.578888688), (1.51892, -104.42392))
            ThreePointArc((1.51892, -104.42392), (2.076881582, -103.076881582), (3.42392, -102.51892))
            Line((3.42392, -102.51892), (16.51892, -102.51892))
            Line((16.51892, -102.51892), (16.51892, -101))
            Line((16.51892, -101), (3.42392, -101))
        make_face()
    extrude(amount=EDGE_FLANGE7_4_DEPTH)

    # Edge-Flange8 strip (across the edge) → Edge-Flange8 strip cut (cut)
    with BuildSketch(Plane(origin=(102, 0, 100), x_dir=(1, 0, 0), z_dir=(0, 0, -1))):
        with Locations((-2.51892, -0.75946)):
            Rectangle(EDGE_FLANGE8_STRIP_W, EDGE_FLANGE8_STRIP_H)
    extrude(amount=EDGE_FLANGE8_STRIP_CUT_DEPTH, mode=Mode.SUBTRACT)

    # Edge-Flange8 relief (on the sheet) → Edge-Flange8 relief cut (cut)
    with BuildSketch(Plane(origin=(105.42392, 0, 100), x_dir=(1, 0, 0), z_dir=(0, -1, 0))):
        with Locations((-5.56311, 0.37973)):
            Rectangle(EDGE_FLANGE8_RELIEF_W, EDGE_FLANGE8_RELIEF_H)
        with Locations((-5.56311, -200.37973)):
            Rectangle(EDGE_FLANGE8_RELIEF_W, EDGE_FLANGE8_RELIEF_H)
    extrude(amount=-EDGE_FLANGE8_RELIEF_CUT_DEPTH, mode=Mode.SUBTRACT)

    # Edge-Flange8 strip 2 (across the edge) → Edge-Flange8 strip cut 2 (cut)
    with BuildSketch(Plane(origin=(-102, 0, -100), x_dir=(-1, 0, 0), z_dir=(0, 0, 1))):
        with Locations((-2.51892, -0.75946)):
            Rectangle(EDGE_FLANGE8_STRIP_2_W, EDGE_FLANGE8_STRIP_2_H)
    extrude(amount=EDGE_FLANGE8_STRIP_CUT_2_DEPTH, mode=Mode.SUBTRACT)

    # Edge-Flange8 relief 2 (on the sheet) → Edge-Flange8 relief cut 2 (cut)
    with BuildSketch(Plane(origin=(-105.42392, 0, -100), x_dir=(-1, 0, 0), z_dir=(0, -1, 0))):
        with Locations((-5.56311, 0.37973)):
            Rectangle(EDGE_FLANGE8_RELIEF_2_W, EDGE_FLANGE8_RELIEF_2_H)
        with Locations((-5.56311, -200.37973)):
            Rectangle(EDGE_FLANGE8_RELIEF_2_W, EDGE_FLANGE8_RELIEF_2_H)
    extrude(amount=-EDGE_FLANGE8_RELIEF_CUT_2_DEPTH, mode=Mode.SUBTRACT)

    # Edge-Flange8 section (across the edge) → Edge-Flange8 (add)
    with BuildSketch(Plane(origin=(102, 0, 100), x_dir=(1, 0, 0), z_dir=(0, 0, -1))):
        with BuildLine():
            Line((0, 1.905), (0, 15))
            Line((0, 15), (1.51892, 15))
            Line((1.51892, 15), (1.51892, 1.905))
            ThreePointArc((1.51892, 1.905), (2.076881582, 0.557961582), (3.42392, 0))
            Line((3.42392, 0), (3.42392, -1.51892))
            ThreePointArc((3.42392, -1.51892), (1.00284295, -0.51607705), (0, 1.905))
        make_face()
    extrude(amount=EDGE_FLANGE8_DEPTH)

    # Edge-Flange8 section 2 (across the edge) → Edge-Flange8 bend (add)
    with BuildSketch(Plane(origin=(-102, 0, -100), x_dir=(-1, 0, 0), z_dir=(0, 0, 1))):
        with BuildLine():
            Line((0, 1.905), (0, 15))
            Line((0, 15), (1.51892, 15))
            Line((1.51892, 15), (1.51892, 1.905))
            ThreePointArc((1.51892, 1.905), (2.076881582, 0.557961582), (3.42392, 0))
            Line((3.42392, 0), (3.42392, -1.51892))
            ThreePointArc((3.42392, -1.51892), (1.00284295, -0.51607705), (0, 1.905))
        make_face()
    extrude(amount=EDGE_FLANGE8_BEND_DEPTH)

    # Break-Corner1 outline → Break-Corner1 (cut)
    with BuildSketch(Plane(origin=(0, 0, 0), x_dir=(0.7071067811865471, 0.707106781186548, 0), z_dir=(0.707106781186548, -0.707106781186547, 0)).offset(BREAK_CORNER1_START)):
        with Locations((-59, 0)):
            Rectangle(BREAK_CORNER1_OUTLINE_W, BREAK_CORNER1_OUTLINE_H)
    extrude(amount=BREAK_CORNER1_DEPTH, mode=Mode.SUBTRACT)

    # Break-Corner1 2 outline → Break-Corner1 2 (cut)
    with BuildSketch(Plane(origin=(0, 0, 0), x_dir=(0.7071067811865471, -0.707106781186548, 0), z_dir=(0.707106781186548, 0.707106781186547, 0)).offset(BREAK_CORNER1_START_2)):
        with Locations((59, 0)):
            Rectangle(BREAK_CORNER1_2_OUTLINE_W, BREAK_CORNER1_2_OUTLINE_H)
    extrude(amount=BREAK_CORNER1_2_DEPTH, mode=Mode.SUBTRACT)

    # Break-Corner1 3 outline → Break-Corner1 3 (cut)
    with BuildSketch(Plane(origin=(0, 0, 0), x_dir=(1, 0, 0), z_dir=(0, 0.707106781186549, -0.707106781186546)).offset(BREAK_CORNER1_START_3)):
        with Locations((0, -60)):
            Rectangle(BREAK_CORNER1_3_OUTLINE_W, BREAK_CORNER1_3_OUTLINE_H)
    extrude(amount=BREAK_CORNER1_3_DEPTH, mode=Mode.SUBTRACT)

    # Break-Corner1 4 outline → Break-Corner1 4 (cut)
    with BuildSketch(Plane(origin=(0, 0, 0), x_dir=(1, 0, 0), z_dir=(0, 0.707106781186547, 0.707106781186548)).offset(BREAK_CORNER1_START_3)):
        with Locations((0, 60)):
            Rectangle(BREAK_CORNER1_4_OUTLINE_W, BREAK_CORNER1_4_OUTLINE_H)
    extrude(amount=BREAK_CORNER1_4_DEPTH, mode=Mode.SUBTRACT)

    # Edge-Flange11 strip (across the edge) → Edge-Flange11 strip cut (cut)
    with BuildSketch(Plane(origin=(-150, 21.51892, 150), x_dir=(0, -1, 0), z_dir=(1, 0, 0))):
        with Locations((-3.03784, -0.75946)):
            Rectangle(EDGE_FLANGE11_STRIP_W, EDGE_FLANGE11_STRIP_H)
    edge_flange11_strip_cut = extrude(amount=EDGE_FLANGE11_STRIP_CUT_DEPTH, mode=Mode.SUBTRACT)

    # Edge-Flange11 relief (on the sheet) → Edge-Flange11 relief cut (cut)
    with BuildSketch(Plane(origin=(-150, 19.61392, 150), x_dir=(0, -1, 0), z_dir=(0, 0, -1))):
        with Locations((-4.56311, -28.884413669)):
            Rectangle(EDGE_FLANGE11_RELIEF_W, EDGE_FLANGE11_RELIEF_H)
    edge_flange11_relief_cut = extrude(amount=-EDGE_FLANGE11_RELIEF_CUT_DEPTH, mode=Mode.SUBTRACT)

    # Edge-Flange11 section (across the edge) → Edge-Flange11 (add)
    with BuildSketch(Plane(origin=(-150, 21.51892, 150), x_dir=(0, -1, 0), z_dir=(1, 0, 0))):
        with BuildLine():
            Line((-1.51892, 1.905), (-1.51892, 18))
            Line((-1.51892, 18), (0, 18))
            Line((0, 18), (0, 1.905))
            ThreePointArc((0, 1.905), (0.557961582, 0.557961582), (1.905, 0))
            Line((1.905, 0), (1.905, -1.51892))
            ThreePointArc((1.905, -1.51892), (-0.51607705, -0.51607705), (-1.51892, 1.905))
        make_face()
    edge_flange11 = extrude(amount=EDGE_FLANGE11_DEPTH)

    # Edge-Flange12 strip (across the edge) → Edge-Flange12 strip cut (cut)
    with BuildSketch(Plane(origin=(-150, 21.51892, 132), x_dir=(0, 0, 1), z_dir=(1, 0, 0))):
        with Locations((-3.03784, -0.75946)):
            Rectangle(EDGE_FLANGE12_STRIP_W, EDGE_FLANGE12_STRIP_H)
    edge_flange12_strip_cut = extrude(amount=EDGE_FLANGE12_STRIP_CUT_DEPTH, mode=Mode.SUBTRACT)

    # Edge-Flange12 section (across the edge) → Edge-Flange12 (add)
    with BuildSketch(Plane(origin=(-150, 21.51892, 132), x_dir=(0, 0, 1), z_dir=(1, 0, 0))):
        with BuildLine():
            Line((-1.51892, 1.905), (-1.51892, 19.9))
            Line((-1.51892, 19.9), (0, 19.9))
            Line((0, 19.9), (0, 1.905))
            ThreePointArc((0, 1.905), (0.557961582, 0.557961582), (1.905, 0))
            Line((1.905, 0), (1.905, -1.51892))
            ThreePointArc((1.905, -1.51892), (-0.51607705, -0.51607705), (-1.51892, 1.905))
        make_face()
    edge_flange12 = extrude(amount=EDGE_FLANGE12_DEPTH)

    # Mirror1: Edge-Flange11 strip cut, Edge-Flange11 relief cut, Edge-Flange11, Edge-Flange12 strip cut, Edge-Flange12 across plane
    add(edge_flange11_strip_cut.mirror(Plane(origin=(0, 0, 0), x_dir=(0, 0, 1), z_dir=(1, 0, 0))), mode=Mode.SUBTRACT)
    add(edge_flange11_relief_cut.mirror(Plane(origin=(0, 0, 0), x_dir=(0, 0, 1), z_dir=(1, 0, 0))), mode=Mode.SUBTRACT)
    add(edge_flange11.mirror(Plane(origin=(0, 0, 0), x_dir=(0, 0, 1), z_dir=(1, 0, 0))))
    add(edge_flange12_strip_cut.mirror(Plane(origin=(0, 0, 0), x_dir=(0, 0, 1), z_dir=(1, 0, 0))), mode=Mode.SUBTRACT)
    add(edge_flange12.mirror(Plane(origin=(0, 0, 0), x_dir=(0, 0, 1), z_dir=(1, 0, 0))))


solid = part.part
